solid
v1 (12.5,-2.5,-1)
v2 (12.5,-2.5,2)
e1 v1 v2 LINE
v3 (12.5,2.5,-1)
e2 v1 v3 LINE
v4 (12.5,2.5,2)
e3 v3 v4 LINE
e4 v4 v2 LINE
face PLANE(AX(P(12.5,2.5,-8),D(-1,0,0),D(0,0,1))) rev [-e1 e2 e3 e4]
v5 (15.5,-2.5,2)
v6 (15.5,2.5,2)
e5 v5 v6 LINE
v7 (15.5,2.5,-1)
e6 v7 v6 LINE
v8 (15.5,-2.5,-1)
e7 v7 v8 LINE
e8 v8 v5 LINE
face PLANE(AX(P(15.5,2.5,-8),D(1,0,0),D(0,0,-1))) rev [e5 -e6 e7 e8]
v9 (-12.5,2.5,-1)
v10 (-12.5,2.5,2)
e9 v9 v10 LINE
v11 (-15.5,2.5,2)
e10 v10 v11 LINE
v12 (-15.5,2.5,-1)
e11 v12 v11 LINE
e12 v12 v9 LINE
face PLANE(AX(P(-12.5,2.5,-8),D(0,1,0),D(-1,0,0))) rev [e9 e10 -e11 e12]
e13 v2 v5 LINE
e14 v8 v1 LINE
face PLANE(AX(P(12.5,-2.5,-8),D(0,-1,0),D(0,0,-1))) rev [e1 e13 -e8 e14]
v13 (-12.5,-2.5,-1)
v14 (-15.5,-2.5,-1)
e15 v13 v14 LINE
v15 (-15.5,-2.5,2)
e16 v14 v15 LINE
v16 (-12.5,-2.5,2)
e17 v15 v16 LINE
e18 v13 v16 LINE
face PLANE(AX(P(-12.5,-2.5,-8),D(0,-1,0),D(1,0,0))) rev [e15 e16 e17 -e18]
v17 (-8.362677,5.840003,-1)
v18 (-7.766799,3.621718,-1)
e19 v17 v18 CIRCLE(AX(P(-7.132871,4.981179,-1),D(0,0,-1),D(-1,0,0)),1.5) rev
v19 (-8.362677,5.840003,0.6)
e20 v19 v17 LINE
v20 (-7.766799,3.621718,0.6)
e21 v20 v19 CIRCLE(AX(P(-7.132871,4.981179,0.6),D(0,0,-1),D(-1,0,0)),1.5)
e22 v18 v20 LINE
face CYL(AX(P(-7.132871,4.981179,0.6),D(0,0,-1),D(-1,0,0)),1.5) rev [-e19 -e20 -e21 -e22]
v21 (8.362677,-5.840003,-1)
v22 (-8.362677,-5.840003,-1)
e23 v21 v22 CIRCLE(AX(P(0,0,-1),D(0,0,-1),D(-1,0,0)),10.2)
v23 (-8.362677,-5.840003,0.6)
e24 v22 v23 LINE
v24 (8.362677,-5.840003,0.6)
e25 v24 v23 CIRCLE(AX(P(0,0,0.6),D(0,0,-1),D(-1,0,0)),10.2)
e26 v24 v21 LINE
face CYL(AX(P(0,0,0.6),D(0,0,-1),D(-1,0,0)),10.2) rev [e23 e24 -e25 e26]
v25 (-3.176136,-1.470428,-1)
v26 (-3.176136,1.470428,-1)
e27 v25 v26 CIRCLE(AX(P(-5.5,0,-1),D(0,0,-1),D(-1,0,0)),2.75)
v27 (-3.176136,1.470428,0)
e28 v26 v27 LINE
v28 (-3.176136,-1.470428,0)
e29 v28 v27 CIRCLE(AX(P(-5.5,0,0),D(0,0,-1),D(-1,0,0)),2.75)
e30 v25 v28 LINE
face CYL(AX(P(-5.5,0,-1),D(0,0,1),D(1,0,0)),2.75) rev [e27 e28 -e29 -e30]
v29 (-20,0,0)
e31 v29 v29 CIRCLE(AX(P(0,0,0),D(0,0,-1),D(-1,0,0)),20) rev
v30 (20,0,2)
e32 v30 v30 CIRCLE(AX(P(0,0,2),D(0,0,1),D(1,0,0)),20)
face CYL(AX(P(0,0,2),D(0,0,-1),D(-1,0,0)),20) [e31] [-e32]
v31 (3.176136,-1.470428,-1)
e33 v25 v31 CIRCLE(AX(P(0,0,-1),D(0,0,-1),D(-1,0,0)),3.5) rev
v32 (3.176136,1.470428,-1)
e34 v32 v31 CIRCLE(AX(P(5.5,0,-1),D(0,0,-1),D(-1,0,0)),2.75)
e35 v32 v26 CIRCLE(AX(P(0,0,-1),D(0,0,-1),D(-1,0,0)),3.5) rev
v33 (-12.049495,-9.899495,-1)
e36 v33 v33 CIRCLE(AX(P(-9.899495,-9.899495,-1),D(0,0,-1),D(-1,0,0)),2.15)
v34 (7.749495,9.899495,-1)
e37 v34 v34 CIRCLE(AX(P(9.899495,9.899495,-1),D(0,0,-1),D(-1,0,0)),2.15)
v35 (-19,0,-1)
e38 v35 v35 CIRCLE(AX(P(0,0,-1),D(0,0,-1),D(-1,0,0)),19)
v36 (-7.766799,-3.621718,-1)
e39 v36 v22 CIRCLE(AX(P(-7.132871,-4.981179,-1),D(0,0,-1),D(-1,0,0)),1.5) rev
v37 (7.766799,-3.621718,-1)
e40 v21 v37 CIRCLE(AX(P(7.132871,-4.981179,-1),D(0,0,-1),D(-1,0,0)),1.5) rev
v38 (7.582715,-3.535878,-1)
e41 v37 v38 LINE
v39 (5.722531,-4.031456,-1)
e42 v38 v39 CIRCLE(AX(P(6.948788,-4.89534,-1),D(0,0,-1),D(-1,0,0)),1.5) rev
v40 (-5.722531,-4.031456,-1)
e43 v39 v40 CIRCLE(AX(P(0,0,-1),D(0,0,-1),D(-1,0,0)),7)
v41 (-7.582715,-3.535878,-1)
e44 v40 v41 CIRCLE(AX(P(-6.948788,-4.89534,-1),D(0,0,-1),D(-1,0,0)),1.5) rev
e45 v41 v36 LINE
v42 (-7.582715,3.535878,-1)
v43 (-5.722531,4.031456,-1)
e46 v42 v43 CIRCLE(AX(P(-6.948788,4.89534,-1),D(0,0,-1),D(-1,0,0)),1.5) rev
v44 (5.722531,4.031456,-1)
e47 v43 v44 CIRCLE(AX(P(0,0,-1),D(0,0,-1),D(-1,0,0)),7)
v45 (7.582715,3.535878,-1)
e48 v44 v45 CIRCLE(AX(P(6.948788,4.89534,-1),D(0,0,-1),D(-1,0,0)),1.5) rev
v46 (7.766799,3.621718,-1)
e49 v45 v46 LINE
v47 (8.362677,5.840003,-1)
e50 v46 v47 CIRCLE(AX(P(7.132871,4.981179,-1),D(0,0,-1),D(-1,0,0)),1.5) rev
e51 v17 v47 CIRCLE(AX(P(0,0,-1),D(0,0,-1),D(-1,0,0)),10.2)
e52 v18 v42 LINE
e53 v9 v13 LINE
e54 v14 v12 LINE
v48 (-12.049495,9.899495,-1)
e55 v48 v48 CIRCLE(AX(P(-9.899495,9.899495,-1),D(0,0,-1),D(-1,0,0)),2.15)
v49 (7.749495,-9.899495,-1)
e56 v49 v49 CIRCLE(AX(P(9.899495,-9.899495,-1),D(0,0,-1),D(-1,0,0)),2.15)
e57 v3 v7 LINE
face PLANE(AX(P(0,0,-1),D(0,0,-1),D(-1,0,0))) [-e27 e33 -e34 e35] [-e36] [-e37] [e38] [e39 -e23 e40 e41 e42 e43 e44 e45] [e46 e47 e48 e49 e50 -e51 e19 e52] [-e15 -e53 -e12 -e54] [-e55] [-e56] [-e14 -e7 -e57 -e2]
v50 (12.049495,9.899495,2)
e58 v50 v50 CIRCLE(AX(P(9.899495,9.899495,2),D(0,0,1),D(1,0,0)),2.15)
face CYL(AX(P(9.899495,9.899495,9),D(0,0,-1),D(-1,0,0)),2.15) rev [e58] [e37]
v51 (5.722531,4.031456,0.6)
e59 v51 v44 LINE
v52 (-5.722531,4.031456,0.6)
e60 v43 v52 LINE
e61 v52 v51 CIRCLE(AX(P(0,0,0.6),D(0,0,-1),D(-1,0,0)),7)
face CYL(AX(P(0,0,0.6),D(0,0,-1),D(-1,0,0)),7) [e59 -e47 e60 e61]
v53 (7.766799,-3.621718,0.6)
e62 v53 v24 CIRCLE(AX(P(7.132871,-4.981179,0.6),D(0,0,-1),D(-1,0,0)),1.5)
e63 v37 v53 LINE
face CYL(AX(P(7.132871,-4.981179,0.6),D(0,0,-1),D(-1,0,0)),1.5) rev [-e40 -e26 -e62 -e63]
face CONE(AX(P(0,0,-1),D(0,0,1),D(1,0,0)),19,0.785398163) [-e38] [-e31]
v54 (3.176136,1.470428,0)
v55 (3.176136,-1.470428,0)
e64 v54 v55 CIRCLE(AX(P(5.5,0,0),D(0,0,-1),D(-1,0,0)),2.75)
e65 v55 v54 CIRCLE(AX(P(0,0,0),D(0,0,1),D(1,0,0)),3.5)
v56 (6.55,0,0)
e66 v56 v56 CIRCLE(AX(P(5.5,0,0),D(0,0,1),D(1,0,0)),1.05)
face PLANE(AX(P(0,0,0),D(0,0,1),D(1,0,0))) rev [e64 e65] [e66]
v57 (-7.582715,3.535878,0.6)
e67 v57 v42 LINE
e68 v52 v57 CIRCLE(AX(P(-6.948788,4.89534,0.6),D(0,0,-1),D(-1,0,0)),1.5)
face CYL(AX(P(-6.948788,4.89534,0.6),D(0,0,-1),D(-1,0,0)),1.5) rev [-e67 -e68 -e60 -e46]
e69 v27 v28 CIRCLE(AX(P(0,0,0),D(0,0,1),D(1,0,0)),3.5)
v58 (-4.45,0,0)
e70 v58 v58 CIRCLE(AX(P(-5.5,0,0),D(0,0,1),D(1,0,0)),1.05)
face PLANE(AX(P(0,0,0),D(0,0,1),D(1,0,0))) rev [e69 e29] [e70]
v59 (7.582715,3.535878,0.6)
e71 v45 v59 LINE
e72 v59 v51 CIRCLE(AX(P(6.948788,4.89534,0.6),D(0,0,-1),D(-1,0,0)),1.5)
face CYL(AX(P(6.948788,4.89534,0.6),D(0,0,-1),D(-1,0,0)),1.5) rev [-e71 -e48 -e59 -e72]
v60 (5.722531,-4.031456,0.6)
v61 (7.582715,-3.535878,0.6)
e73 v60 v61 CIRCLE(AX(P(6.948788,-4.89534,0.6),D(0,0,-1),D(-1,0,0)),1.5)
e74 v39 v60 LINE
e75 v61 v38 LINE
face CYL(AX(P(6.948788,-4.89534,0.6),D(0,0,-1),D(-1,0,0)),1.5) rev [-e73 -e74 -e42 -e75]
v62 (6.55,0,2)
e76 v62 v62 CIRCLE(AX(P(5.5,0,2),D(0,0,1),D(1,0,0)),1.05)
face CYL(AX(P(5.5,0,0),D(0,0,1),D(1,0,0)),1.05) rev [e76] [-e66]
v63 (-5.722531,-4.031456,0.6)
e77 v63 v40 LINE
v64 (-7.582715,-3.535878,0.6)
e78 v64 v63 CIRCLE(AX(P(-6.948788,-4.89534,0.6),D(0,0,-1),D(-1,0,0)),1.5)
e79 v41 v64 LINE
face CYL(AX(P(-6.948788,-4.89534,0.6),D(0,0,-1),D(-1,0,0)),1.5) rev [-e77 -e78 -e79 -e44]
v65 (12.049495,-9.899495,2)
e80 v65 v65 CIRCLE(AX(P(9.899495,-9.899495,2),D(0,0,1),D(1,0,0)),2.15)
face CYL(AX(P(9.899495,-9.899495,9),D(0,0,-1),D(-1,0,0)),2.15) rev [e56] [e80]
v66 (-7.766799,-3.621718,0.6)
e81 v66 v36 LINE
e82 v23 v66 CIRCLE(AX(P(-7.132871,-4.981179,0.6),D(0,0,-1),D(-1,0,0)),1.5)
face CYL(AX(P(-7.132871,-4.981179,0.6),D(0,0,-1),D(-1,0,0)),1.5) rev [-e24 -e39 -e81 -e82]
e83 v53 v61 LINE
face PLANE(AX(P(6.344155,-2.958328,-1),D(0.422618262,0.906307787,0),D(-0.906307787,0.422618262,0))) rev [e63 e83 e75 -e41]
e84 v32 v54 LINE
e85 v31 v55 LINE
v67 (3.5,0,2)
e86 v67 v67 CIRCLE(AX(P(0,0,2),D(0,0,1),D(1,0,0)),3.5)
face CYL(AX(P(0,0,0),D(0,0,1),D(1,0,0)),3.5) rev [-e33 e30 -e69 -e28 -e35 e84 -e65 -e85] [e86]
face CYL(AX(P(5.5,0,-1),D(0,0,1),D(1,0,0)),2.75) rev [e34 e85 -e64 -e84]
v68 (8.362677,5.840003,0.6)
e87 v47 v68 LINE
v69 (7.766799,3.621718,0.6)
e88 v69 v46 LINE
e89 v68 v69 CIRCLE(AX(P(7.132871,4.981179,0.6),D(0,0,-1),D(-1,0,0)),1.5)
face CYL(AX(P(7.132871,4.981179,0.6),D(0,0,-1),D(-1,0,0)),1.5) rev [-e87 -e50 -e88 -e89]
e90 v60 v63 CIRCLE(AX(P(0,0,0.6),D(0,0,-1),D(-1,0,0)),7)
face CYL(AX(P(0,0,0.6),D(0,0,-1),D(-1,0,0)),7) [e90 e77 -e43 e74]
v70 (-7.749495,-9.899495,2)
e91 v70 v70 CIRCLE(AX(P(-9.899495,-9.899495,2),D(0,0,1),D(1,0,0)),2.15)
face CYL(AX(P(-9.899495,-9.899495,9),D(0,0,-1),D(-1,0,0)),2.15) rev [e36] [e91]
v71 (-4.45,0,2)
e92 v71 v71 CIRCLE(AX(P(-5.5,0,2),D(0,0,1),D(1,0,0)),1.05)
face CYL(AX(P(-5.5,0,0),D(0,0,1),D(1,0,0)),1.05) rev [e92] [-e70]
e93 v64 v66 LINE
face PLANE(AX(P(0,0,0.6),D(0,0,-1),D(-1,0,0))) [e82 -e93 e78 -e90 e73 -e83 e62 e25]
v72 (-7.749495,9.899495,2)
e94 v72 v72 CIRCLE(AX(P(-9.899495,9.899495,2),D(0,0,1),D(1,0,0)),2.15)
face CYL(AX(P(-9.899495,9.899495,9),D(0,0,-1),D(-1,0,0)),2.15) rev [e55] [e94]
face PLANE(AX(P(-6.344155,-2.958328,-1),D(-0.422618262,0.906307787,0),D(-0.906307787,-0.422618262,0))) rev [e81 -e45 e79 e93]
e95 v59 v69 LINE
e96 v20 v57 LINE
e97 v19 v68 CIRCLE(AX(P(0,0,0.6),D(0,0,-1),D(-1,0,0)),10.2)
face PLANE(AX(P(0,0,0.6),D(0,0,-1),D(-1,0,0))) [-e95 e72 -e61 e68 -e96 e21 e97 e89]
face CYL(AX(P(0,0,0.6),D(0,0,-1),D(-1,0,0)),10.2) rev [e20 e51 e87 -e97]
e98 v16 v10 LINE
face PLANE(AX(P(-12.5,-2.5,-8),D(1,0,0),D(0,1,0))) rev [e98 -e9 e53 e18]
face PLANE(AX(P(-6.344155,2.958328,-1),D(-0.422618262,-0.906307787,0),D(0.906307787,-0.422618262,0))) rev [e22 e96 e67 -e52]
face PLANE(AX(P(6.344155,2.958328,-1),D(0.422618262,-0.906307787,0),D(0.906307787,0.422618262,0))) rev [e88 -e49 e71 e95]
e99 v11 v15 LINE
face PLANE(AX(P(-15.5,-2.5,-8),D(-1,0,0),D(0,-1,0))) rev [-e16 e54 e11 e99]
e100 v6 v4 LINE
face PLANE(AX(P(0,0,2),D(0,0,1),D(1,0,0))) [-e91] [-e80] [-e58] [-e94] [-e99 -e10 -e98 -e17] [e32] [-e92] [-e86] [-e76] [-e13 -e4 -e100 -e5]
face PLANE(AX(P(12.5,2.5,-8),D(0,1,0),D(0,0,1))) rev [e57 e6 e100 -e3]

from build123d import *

# Parameters (mm, degrees)
SKETCH_1_R               = 20
EXTRUDE_1_DEPTH          = 2
SKETCH_2_R               = 3.5
CUT_EXTRUDE_1_DEPTH      = 2
SKETCH_3_R               = 1.05
CUT_EXTRUDE_2_DEPTH      = 2
EXTRUDE_START            = 1
SKETCH_5_R               = 20
SKETCH_5_R_2             = 8.25
EXTRUDE_3_DEPTH          = 1
EXTRUDE_4_DEPTH          = 1
SKETCH_9_R               = 10.2
SKETCH_9_R_2             = 7
CUT_EXTRUDE_3_DEPTH      = 1.6
EXTRUDE_START_2          = 1.6
EXTRUDE_5_DEPTH          = 1.6
PATTERN_CIRCULAR_2_COUNT = 2
PATTERN_CIRCULAR_2_ANGLE = 180
SKETCH_13_R              = 2.75
CUT_EXTRUDE_4_DEPTH      = 1.6
FILLET_1_R               = 1.5
SKETCH_14_R              = 2.15
CUT_EXTRUDE_5_DEPTH      = 10
SKETCH_15_W              = 3
SKETCH_15_H              = 5
CUT_EXTRUDE_6_DEPTH      = 10
CHAMFER_1_SIZE           = 1


# Some blends are built 0.0001 mm under size
with BuildPart() as part:
    # 草图1 → 凸台-拉伸1 (new body)
    with BuildSketch(Plane.XY):
        Circle(SKETCH_1_R)
    extrude(amount=EXTRUDE_1_DEPTH)

    # 草图2 → 切除-拉伸1 (cut)
    with BuildSketch(Plane.XY.offset(2)):
        Circle(SKETCH_2_R)
    extrude(amount=-CUT_EXTRUDE_1_DEPTH, mode=Mode.SUBTRACT)

    # 草图3 → 切除-拉伸2 (cut)
    with BuildSketch(Plane.XY.offset(2)):
        with Locations((-5.5, 0)):
            Circle(SKETCH_3_R)
        with Locations((5.5, 0)):
            Circle(SKETCH_3_R)
    extrude(amount=-CUT_EXTRUDE_2_DEPTH, mode=Mode.SUBTRACT)

    # 草图5 → 凸台-拉伸3 (add)
    with BuildSketch(Plane(origin=(0, 0, 0), x_dir=(-1, 0, 0), z_dir=(0, 0, -1)).offset(EXTRUDE_START)):
        Circle(SKETCH_5_R)
        Circle(SKETCH_5_R_2, mode=Mode.SUBTRACT)
    extrude(amount=-EXTRUDE_3_DEPTH)

    # 草图8 → 凸台-拉伸4 (add)
    with BuildSketch(Plane(origin=(0, 0, 0), x_dir=(-1, 0, 0), z_dir=(0, 0, -1))):
        with BuildLine():
            ThreePointArc((3.176136364, 1.470427761), (6.265465545, 2.641318326), (8.25, 0))
            ThreePointArc((8.25, 0), (0, 8.25), (-8.25, 0))
            ThreePointArc((-8.25, 0), (-6.265465545, 2.641318326), (-3.176136364, 1.470427761))
            ThreePointArc((-3.176136364, 1.470427761), (0, 3.5), (3.176136364, 1.470427761))
        make_face()
        with BuildLine():
            ThreePointArc((-8.25, 0), (0, -8.25), (8.25, 0))
            ThreePointArc((8.25, 0), (6.265465545, -2.641318326), (3.176136364, -1.470427761))
            ThreePointArc((3.176136364, -1.470427761), (0, -3.5), (-3.176136364, -1.470427761))
            ThreePointArc((-3.176136364, -1.470427761), (-6.265465545, -2.641318326), (-8.25, 0))
        make_face()
    extrude(amount=EXTRUDE_4_DEPTH)

    # 草图9 → 切除-拉伸3 (cut)
    with BuildSketch(Plane(origin=(0, 0, -1), x_dir=(-1, 0, 0), z_dir=(0, 0, -1))):
        Circle(SKETCH_9_R)
        Circle(SKETCH_9_R_2, mode=Mode.SUBTRACT)
    extrude(amount=-CUT_EXTRUDE_3_DEPTH, mode=Mode.SUBTRACT)

    # 草图12 → 凸台-拉伸5 (add)
    with BuildSketch(Plane(origin=(0, 0, 0.6), x_dir=(-1, 0, 0), z_dir=(0, 0, -1)).offset(EXTRUDE_START_2)):
        with BuildLine():
            Line((6.344154509, 2.958327832), (9.244339428, 4.31070627))
            ThreePointArc((9.244339428, 4.31070627), (10.2, 0), (9.244339428, -4.31070627))
            Line((9.244339428, -4.31070627), (6.344154509, -2.958327832))
            ThreePointArc((6.344154509, -2.958327832), (7, 0), (6.344154509, 2.958327832))
        make_face()
    extrude_5 = extrude(amount=-EXTRUDE_5_DEPTH)

    # 阵列(圆周)2: 凸台-拉伸5 ×2 about axis
    pattern_circular_2_axis = Axis((0, 0, 0), (0, 0, 1))
    for i in range(1, PATTERN_CIRCULAR_2_COUNT):
        add(extrude_5.rotate(pattern_circular_2_axis, i * PATTERN_CIRCULAR_2_ANGLE / (PATTERN_CIRCULAR_2_COUNT - 1)))

    # 草图13 → 切除-拉伸4 (cut)
    with BuildSketch(Plane(origin=(0, 0, 0), x_dir=(-1, 0, 0), z_dir=(0, 0, -1))):
        with Locations((5.5, 0)):
            Circle(SKETCH_13_R)
        with Locations((-5.5, 0)):
            Circle(SKETCH_13_R)
    extrude(amount=CUT_EXTRUDE_4_DEPTH, mode=Mode.SUBTRACT)

    # 圆角1
    # the kernel refuses this fillet: 1.5 mm, written as the material it adds along each edge
    with BuildSketch(Plane(origin=(9.244339428, 4.31070627, -1), x_dir=(-0.49945721190303094, 0.8663385559225971, 0), z_dir=(0, 0, 1)), Plane(origin=(-9.244339428, -4.31070627, -1), x_dir=(0.49945721190302483, -0.8663385559226006, 0), z_dir=(0, 0, 1))) as fillet_1_piece_1:
        with BuildLine():
            CenterArc((1.635444705, 1.494373677), FILLET_1_R, 175.035904079, 99.928191842)
            Line((0.141071027, 1.624170876), (0, 0))
            ThreePointArc((0, 0), (0.882620952, -0.038258995), (1.765241903, 0))
        make_face()
    extrude(amount=1.6)
    with BuildSketch(Plane(origin=(9.244339428, -4.31070627, -1), x_dir=(-0.49945721190301884, -0.8663385559226039, 0), z_dir=(0, 0, 1)), Plane(origin=(-9.244339428, 4.31070627, -1), x_dir=(0.4994572119030254, 0.8663385559226003, 0), z_dir=(0, 0, 1))) as fillet_1_piece_2:
        with BuildLine():
            CenterArc((1.635444705, -1.494373677), FILLET_1_R, 85.035904079, 99.928191842)
            Line((0.141071027, -1.624170876), (0, 0))
            ThreePointArc((0, 0), (0.882620952, 0.038258995), (1.765241903, 0))
        make_face()
    extrude(amount=1.6)
    with BuildSketch(Plane(origin=(-6.344154509, 2.958327832, -1), x_dir=(-0.9063077870366493, 0.42261826174070083, 0), z_dir=(0, 0, 1)), Plane(origin=(6.344154509, -2.958327832, -1), x_dir=(0.9063077870366523, -0.4226182617406945, 0), z_dir=(0, 0, 1))) as fillet_1_piece_3:
        with BuildLine():
            CenterArc((1.366600265, -1.5), FILLET_1_R, 90, 79.835751378)
            ThreePointArc((-0.109858605, -1.235294118), (-0.027518743, -0.620084766), (0, 0))
            Line((0, 0), (1.366600265, 0))
        make_face()
    extrude(amount=1.6)
    with BuildSketch(Plane(origin=(-6.344154509, -2.958327832, -1), x_dir=(-0.9063077870366493, -0.4226182617407009, 0), z_dir=(0, 0, 1)), Plane(origin=(6.344154509, 2.958327832, -1), x_dir=(0.9063077870366462, 0.42261826174070743, 0), z_dir=(0, 0, 1))) as fillet_1_piece_4:
        with BuildLine():
            CenterArc((1.366600265, 1.5), FILLET_1_R, 190.164248622, 79.835751378)
            ThreePointArc((-0.109858605, 1.235294118), (-0.027518743, 0.620084766), (0, 0))
            Line((0, 0), (1.366600265, 0))
        make_face()
    extrude(amount=1.6)

    # 草图14 → 切除-拉伸5 (cut)
    with BuildSketch(Plane(origin=(0, 0, -1), x_dir=(-1, 0, 0), z_dir=(0, 0, -1))):
        with Locations((9.899494937, -9.899494937)):
            Circle(SKETCH_14_R)
        with Locations((-9.899494937, -9.899494937)):
            Circle(SKETCH_14_R)
        with Locations((-9.899494937, 9.899494937)):
            Circle(SKETCH_14_R)
        with Locations((9.899494937, 9.899494937)):
            Circle(SKETCH_14_R)
    extrude(amount=-CUT_EXTRUDE_5_DEPTH, mode=Mode.SUBTRACT)

    # 草图15 → 切除-拉伸6 (cut)
    with BuildSketch(Plane.XY.offset(2)):
        with Locations((-14, 0)):
            Rectangle(SKETCH_15_W, SKETCH_15_H)
        with Locations((14, 0)):
            Rectangle(SKETCH_15_W, SKETCH_15_H)
    extrude(amount=-CUT_EXTRUDE_6_DEPTH, mode=Mode.SUBTRACT)

    # 倒角1
    chamfer_1_edges = [part.edges().sort_by_distance(p)[0] for p in [
        (20, 0, -1),
    ]]
    chamfer(chamfer_1_edges, length=CHAMFER_1_SIZE - 0.0001)  # a hair under: the kernel refuses the full size


solid = part.part
